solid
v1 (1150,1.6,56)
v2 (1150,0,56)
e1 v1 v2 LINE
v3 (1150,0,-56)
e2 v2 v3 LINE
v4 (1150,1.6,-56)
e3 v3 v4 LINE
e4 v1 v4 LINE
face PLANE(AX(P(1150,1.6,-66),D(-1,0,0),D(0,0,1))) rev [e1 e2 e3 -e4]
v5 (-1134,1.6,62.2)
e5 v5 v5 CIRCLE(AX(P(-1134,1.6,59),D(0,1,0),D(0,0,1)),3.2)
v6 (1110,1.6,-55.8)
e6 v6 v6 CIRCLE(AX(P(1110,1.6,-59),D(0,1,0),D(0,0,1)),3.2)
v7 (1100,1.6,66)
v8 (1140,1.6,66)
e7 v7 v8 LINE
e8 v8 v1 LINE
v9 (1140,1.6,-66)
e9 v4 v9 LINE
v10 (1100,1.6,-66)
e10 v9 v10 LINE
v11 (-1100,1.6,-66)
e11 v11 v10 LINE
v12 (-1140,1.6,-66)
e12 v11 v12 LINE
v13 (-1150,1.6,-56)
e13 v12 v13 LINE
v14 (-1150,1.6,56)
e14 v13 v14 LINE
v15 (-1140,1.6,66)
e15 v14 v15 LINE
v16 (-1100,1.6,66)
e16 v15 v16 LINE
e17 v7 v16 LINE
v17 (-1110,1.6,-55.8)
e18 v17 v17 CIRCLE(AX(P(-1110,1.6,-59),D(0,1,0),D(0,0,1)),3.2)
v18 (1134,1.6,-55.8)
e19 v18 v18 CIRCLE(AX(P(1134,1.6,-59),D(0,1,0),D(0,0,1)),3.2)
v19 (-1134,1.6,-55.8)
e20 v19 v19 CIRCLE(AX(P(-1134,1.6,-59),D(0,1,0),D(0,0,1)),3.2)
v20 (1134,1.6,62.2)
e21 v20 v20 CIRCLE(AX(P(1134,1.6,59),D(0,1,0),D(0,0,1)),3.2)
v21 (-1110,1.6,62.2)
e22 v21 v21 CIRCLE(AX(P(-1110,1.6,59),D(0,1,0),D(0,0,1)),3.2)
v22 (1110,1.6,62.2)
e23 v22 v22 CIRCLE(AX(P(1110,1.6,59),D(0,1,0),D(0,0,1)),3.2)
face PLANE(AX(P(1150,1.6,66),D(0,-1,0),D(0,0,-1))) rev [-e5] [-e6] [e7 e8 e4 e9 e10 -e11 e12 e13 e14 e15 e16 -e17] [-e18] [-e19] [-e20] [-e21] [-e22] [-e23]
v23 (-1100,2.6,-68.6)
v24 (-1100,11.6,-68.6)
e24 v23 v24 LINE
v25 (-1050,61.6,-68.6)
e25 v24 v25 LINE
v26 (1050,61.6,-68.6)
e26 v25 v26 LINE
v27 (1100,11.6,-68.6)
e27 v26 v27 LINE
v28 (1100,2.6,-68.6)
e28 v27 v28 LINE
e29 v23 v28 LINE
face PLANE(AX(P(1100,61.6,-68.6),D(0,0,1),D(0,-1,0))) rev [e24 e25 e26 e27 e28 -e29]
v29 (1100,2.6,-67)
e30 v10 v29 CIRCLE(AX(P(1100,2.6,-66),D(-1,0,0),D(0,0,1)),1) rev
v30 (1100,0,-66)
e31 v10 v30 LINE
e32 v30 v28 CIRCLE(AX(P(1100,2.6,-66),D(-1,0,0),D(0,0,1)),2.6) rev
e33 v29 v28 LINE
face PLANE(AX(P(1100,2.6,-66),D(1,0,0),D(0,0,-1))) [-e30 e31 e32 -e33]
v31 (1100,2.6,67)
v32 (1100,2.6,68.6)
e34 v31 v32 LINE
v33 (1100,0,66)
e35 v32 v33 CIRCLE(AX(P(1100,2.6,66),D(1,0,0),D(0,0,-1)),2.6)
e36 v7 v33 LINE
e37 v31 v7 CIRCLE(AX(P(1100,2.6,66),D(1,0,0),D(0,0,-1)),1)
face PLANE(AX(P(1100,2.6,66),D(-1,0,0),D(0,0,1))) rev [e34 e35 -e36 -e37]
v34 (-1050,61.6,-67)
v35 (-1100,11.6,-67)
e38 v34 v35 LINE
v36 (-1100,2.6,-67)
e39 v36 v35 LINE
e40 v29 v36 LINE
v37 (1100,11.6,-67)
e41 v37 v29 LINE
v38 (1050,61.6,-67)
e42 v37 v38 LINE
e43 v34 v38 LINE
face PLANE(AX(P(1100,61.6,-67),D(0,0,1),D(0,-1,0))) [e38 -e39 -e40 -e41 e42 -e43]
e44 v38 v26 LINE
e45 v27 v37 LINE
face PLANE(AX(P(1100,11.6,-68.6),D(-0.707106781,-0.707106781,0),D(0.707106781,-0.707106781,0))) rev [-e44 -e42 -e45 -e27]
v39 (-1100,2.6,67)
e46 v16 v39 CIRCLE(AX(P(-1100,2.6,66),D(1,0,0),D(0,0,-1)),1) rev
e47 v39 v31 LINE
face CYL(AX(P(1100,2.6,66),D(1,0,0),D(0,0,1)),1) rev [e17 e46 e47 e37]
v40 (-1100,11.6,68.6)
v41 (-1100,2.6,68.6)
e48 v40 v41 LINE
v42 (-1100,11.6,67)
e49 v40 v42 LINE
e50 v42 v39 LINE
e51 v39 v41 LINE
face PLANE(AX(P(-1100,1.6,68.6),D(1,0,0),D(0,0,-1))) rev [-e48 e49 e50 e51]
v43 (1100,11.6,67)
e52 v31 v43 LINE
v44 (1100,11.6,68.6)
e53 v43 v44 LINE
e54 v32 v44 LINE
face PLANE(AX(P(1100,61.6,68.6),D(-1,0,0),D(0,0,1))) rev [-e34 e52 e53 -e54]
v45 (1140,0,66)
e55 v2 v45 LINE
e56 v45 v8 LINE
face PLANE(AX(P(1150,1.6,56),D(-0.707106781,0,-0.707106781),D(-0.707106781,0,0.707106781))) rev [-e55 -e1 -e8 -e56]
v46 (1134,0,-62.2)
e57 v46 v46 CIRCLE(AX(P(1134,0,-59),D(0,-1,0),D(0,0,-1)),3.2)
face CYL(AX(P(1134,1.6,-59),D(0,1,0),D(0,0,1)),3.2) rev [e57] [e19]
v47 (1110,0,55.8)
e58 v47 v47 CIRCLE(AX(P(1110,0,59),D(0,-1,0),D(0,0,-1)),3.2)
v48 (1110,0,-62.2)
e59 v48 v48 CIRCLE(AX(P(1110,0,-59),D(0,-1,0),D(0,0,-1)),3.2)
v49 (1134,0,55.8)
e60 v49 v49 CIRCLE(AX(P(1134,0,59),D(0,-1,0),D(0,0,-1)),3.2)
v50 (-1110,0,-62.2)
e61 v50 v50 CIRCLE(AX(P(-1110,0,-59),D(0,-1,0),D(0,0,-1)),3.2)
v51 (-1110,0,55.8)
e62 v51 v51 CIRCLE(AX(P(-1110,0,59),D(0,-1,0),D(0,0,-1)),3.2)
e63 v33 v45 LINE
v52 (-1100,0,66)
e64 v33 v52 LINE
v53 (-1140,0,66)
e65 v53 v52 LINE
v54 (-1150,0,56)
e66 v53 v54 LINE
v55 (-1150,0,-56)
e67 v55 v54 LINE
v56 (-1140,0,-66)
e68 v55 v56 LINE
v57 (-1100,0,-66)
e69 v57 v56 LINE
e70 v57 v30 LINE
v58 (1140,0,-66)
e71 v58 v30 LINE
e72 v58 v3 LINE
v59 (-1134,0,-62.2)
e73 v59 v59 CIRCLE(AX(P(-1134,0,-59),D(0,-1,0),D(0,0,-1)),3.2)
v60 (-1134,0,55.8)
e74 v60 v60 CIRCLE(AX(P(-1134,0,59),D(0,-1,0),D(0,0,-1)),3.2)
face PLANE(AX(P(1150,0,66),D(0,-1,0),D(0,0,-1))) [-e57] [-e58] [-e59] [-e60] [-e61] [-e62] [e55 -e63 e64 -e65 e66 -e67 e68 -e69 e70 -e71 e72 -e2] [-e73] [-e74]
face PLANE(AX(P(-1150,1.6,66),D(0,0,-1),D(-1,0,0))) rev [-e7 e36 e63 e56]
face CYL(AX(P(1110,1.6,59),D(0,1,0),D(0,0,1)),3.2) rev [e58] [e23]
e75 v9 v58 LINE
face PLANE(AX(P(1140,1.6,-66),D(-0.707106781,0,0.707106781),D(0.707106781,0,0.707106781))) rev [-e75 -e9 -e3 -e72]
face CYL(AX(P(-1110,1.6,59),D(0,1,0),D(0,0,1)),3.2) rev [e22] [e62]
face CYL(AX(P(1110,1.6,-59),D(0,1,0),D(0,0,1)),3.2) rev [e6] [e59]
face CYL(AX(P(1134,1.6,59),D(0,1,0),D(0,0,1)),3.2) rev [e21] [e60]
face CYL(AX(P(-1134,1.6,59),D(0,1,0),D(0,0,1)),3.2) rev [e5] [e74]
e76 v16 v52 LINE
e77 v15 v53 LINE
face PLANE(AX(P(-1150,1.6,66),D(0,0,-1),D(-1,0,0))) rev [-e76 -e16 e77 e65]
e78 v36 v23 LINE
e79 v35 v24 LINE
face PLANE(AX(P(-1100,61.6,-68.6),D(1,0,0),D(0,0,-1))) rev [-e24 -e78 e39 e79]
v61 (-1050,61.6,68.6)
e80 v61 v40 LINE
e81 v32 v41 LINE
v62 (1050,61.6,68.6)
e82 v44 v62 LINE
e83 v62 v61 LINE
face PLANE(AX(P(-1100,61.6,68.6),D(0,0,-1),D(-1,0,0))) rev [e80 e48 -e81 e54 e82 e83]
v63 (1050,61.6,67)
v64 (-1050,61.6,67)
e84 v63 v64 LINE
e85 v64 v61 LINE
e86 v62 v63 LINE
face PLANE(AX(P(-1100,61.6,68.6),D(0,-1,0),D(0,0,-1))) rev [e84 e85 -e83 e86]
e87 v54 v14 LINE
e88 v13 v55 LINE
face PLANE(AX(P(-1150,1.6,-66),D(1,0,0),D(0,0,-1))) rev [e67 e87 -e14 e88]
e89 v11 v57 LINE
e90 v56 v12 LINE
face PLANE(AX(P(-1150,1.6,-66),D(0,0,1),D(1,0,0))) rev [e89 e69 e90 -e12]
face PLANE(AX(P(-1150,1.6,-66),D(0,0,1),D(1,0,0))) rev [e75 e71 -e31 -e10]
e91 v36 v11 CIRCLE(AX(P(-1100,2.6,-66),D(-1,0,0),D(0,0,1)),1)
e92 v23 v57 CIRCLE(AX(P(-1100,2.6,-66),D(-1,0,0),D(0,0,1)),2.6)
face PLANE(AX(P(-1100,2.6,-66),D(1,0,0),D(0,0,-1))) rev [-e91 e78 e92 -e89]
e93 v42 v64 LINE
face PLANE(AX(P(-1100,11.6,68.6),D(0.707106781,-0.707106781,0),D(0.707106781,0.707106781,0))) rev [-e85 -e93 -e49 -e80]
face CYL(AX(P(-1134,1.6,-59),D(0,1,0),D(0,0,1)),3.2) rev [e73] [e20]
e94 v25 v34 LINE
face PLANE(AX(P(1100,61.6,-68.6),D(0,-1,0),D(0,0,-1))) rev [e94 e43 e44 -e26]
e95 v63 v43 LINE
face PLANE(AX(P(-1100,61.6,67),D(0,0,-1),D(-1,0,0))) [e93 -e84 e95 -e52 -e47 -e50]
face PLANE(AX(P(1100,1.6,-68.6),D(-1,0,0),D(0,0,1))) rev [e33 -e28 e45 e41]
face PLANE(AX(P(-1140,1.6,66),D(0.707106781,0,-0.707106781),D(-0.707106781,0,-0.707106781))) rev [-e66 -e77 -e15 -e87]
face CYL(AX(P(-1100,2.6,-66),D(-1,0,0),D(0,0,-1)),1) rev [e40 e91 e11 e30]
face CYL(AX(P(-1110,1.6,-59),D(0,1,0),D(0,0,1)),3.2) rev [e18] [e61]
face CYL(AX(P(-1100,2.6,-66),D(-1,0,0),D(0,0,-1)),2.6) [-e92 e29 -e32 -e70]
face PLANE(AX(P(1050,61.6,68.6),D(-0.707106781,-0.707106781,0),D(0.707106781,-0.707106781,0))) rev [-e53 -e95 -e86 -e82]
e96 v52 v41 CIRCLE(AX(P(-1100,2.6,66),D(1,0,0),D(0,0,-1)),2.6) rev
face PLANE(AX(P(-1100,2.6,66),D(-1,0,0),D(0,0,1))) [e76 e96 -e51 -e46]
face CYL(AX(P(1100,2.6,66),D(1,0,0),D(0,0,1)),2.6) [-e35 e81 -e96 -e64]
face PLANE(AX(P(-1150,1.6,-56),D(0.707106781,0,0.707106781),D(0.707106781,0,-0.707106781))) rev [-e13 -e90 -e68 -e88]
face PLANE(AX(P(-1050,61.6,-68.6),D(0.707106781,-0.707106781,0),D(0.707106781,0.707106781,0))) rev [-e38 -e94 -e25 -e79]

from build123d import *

# Parameters (mm, degrees)
SKETCH_1_W                  = 2300
SKETCH_1_H                  = 132
SM_BASE_FLANGE_1_DEPTH      = 1.6
SM_EDGE_FLANGE_1_DEPTH      = 2200
SM_EDGE_FLANGE_1_BEND_DEPTH = 2200
HOLE_WIZARD_6_4_6_4_1_D     = 6.4
HOLE_WIZARD_6_4_6_4_1_DEPTH = 2
CHAMFER_1_SIZE              = 50
CHAMFER_3_SIZE              = 10


# Sheet-metal steps are written as plain solids
with BuildPart() as part:
    # Sketch 1 → 基材-凸緣1 (new body)
    with BuildSketch(Plane(origin=(0, 0, 0), x_dir=(1, 0, 0), z_dir=(0, 1, 0))):
        Rectangle(SKETCH_1_W, SKETCH_1_H)
    extrude(amount=SM_BASE_FLANGE_1_DEPTH)

    # 邊線-凸緣1 section (across the edge) → 邊線-凸緣1 (add)
    with BuildSketch(Plane(origin=(1100, 1.6, -67), x_dir=(0, 0, 1), z_dir=(-1, 0, 0))):
        with BuildLine():
            Line((-1.6, 1), (-1.6, 60))
            Line((-1.6, 60), (0, 60))
            Line((0, 60), (0, 1))
            ThreePointArc((0, 1), (0.292893219, 0.292893219), (1, 0))
            Line((1, 0), (1, -1.6))
            ThreePointArc((1, -1.6), (-0.838477631, -0.838477631), (-1.6, 1))
        make_face()
    extrude(amount=SM_EDGE_FLANGE_1_DEPTH)

    # 邊線-凸緣1 section 2 (across the edge) → 邊線-凸緣1 bend (add)
    with BuildSketch(Plane(origin=(-1100, 1.6, 67), x_dir=(0, 0, -1), z_dir=(1, 0, 0))):
        with BuildLine():
            Line((-1.6, 1), (-1.6, 60))
            Line((-1.6, 60), (0, 60))
            Line((0, 60), (0, 1))
            ThreePointArc((0, 1), (0.292893219, 0.292893219), (1, 0))
            Line((1, 0), (1, -1.6))
            ThreePointArc((1, -1.6), (-0.838477631, -0.838477631), (-1.6, 1))
        make_face()
    extrude(amount=SM_EDGE_FLANGE_1_BEND_DEPTH)

    # Ø6.4 (6.4) 直徑孔1
    with Locations(Plane(origin=(0, 1.6, 0), x_dir=(-1, 0, 0), z_dir=(0, 1, 0))):
        with Locations((1110, -59), (1134, -59), (1134, 59), (1110, 59), (-1110, -59), (-1134, -59), (-1110, 59), (-1134, 59)):
            Hole(HOLE_WIZARD_6_4_6_4_1_D / 2, depth=HOLE_WIZARD_6_4_6_4_1_DEPTH)

    # 導角1
    chamfer_1_edges = [part.edges().sort_by_distance(p)[0] for p in [
        (1100, 61.6, -67.8),
        (-1100, 61.6, -67.8),
        (-1100, 61.6, 67.8),
        (1100, 61.6, 67.8),
    ]]
    chamfer(chamfer_1_edges, length=CHAMFER_1_SIZE)

    # 導角3
    chamfer_3_edges = [part.edges().sort_by_distance(p)[0] for p in [
        (-1150, 0.8, 66),
        (-1150, 0.8, -66),
        (1150, 0.8, -66),
        (1150, 0.8, 66),
    ]]
    chamfer(chamfer_3_edges, length=CHAMFER_3_SIZE)


solid = part.part
